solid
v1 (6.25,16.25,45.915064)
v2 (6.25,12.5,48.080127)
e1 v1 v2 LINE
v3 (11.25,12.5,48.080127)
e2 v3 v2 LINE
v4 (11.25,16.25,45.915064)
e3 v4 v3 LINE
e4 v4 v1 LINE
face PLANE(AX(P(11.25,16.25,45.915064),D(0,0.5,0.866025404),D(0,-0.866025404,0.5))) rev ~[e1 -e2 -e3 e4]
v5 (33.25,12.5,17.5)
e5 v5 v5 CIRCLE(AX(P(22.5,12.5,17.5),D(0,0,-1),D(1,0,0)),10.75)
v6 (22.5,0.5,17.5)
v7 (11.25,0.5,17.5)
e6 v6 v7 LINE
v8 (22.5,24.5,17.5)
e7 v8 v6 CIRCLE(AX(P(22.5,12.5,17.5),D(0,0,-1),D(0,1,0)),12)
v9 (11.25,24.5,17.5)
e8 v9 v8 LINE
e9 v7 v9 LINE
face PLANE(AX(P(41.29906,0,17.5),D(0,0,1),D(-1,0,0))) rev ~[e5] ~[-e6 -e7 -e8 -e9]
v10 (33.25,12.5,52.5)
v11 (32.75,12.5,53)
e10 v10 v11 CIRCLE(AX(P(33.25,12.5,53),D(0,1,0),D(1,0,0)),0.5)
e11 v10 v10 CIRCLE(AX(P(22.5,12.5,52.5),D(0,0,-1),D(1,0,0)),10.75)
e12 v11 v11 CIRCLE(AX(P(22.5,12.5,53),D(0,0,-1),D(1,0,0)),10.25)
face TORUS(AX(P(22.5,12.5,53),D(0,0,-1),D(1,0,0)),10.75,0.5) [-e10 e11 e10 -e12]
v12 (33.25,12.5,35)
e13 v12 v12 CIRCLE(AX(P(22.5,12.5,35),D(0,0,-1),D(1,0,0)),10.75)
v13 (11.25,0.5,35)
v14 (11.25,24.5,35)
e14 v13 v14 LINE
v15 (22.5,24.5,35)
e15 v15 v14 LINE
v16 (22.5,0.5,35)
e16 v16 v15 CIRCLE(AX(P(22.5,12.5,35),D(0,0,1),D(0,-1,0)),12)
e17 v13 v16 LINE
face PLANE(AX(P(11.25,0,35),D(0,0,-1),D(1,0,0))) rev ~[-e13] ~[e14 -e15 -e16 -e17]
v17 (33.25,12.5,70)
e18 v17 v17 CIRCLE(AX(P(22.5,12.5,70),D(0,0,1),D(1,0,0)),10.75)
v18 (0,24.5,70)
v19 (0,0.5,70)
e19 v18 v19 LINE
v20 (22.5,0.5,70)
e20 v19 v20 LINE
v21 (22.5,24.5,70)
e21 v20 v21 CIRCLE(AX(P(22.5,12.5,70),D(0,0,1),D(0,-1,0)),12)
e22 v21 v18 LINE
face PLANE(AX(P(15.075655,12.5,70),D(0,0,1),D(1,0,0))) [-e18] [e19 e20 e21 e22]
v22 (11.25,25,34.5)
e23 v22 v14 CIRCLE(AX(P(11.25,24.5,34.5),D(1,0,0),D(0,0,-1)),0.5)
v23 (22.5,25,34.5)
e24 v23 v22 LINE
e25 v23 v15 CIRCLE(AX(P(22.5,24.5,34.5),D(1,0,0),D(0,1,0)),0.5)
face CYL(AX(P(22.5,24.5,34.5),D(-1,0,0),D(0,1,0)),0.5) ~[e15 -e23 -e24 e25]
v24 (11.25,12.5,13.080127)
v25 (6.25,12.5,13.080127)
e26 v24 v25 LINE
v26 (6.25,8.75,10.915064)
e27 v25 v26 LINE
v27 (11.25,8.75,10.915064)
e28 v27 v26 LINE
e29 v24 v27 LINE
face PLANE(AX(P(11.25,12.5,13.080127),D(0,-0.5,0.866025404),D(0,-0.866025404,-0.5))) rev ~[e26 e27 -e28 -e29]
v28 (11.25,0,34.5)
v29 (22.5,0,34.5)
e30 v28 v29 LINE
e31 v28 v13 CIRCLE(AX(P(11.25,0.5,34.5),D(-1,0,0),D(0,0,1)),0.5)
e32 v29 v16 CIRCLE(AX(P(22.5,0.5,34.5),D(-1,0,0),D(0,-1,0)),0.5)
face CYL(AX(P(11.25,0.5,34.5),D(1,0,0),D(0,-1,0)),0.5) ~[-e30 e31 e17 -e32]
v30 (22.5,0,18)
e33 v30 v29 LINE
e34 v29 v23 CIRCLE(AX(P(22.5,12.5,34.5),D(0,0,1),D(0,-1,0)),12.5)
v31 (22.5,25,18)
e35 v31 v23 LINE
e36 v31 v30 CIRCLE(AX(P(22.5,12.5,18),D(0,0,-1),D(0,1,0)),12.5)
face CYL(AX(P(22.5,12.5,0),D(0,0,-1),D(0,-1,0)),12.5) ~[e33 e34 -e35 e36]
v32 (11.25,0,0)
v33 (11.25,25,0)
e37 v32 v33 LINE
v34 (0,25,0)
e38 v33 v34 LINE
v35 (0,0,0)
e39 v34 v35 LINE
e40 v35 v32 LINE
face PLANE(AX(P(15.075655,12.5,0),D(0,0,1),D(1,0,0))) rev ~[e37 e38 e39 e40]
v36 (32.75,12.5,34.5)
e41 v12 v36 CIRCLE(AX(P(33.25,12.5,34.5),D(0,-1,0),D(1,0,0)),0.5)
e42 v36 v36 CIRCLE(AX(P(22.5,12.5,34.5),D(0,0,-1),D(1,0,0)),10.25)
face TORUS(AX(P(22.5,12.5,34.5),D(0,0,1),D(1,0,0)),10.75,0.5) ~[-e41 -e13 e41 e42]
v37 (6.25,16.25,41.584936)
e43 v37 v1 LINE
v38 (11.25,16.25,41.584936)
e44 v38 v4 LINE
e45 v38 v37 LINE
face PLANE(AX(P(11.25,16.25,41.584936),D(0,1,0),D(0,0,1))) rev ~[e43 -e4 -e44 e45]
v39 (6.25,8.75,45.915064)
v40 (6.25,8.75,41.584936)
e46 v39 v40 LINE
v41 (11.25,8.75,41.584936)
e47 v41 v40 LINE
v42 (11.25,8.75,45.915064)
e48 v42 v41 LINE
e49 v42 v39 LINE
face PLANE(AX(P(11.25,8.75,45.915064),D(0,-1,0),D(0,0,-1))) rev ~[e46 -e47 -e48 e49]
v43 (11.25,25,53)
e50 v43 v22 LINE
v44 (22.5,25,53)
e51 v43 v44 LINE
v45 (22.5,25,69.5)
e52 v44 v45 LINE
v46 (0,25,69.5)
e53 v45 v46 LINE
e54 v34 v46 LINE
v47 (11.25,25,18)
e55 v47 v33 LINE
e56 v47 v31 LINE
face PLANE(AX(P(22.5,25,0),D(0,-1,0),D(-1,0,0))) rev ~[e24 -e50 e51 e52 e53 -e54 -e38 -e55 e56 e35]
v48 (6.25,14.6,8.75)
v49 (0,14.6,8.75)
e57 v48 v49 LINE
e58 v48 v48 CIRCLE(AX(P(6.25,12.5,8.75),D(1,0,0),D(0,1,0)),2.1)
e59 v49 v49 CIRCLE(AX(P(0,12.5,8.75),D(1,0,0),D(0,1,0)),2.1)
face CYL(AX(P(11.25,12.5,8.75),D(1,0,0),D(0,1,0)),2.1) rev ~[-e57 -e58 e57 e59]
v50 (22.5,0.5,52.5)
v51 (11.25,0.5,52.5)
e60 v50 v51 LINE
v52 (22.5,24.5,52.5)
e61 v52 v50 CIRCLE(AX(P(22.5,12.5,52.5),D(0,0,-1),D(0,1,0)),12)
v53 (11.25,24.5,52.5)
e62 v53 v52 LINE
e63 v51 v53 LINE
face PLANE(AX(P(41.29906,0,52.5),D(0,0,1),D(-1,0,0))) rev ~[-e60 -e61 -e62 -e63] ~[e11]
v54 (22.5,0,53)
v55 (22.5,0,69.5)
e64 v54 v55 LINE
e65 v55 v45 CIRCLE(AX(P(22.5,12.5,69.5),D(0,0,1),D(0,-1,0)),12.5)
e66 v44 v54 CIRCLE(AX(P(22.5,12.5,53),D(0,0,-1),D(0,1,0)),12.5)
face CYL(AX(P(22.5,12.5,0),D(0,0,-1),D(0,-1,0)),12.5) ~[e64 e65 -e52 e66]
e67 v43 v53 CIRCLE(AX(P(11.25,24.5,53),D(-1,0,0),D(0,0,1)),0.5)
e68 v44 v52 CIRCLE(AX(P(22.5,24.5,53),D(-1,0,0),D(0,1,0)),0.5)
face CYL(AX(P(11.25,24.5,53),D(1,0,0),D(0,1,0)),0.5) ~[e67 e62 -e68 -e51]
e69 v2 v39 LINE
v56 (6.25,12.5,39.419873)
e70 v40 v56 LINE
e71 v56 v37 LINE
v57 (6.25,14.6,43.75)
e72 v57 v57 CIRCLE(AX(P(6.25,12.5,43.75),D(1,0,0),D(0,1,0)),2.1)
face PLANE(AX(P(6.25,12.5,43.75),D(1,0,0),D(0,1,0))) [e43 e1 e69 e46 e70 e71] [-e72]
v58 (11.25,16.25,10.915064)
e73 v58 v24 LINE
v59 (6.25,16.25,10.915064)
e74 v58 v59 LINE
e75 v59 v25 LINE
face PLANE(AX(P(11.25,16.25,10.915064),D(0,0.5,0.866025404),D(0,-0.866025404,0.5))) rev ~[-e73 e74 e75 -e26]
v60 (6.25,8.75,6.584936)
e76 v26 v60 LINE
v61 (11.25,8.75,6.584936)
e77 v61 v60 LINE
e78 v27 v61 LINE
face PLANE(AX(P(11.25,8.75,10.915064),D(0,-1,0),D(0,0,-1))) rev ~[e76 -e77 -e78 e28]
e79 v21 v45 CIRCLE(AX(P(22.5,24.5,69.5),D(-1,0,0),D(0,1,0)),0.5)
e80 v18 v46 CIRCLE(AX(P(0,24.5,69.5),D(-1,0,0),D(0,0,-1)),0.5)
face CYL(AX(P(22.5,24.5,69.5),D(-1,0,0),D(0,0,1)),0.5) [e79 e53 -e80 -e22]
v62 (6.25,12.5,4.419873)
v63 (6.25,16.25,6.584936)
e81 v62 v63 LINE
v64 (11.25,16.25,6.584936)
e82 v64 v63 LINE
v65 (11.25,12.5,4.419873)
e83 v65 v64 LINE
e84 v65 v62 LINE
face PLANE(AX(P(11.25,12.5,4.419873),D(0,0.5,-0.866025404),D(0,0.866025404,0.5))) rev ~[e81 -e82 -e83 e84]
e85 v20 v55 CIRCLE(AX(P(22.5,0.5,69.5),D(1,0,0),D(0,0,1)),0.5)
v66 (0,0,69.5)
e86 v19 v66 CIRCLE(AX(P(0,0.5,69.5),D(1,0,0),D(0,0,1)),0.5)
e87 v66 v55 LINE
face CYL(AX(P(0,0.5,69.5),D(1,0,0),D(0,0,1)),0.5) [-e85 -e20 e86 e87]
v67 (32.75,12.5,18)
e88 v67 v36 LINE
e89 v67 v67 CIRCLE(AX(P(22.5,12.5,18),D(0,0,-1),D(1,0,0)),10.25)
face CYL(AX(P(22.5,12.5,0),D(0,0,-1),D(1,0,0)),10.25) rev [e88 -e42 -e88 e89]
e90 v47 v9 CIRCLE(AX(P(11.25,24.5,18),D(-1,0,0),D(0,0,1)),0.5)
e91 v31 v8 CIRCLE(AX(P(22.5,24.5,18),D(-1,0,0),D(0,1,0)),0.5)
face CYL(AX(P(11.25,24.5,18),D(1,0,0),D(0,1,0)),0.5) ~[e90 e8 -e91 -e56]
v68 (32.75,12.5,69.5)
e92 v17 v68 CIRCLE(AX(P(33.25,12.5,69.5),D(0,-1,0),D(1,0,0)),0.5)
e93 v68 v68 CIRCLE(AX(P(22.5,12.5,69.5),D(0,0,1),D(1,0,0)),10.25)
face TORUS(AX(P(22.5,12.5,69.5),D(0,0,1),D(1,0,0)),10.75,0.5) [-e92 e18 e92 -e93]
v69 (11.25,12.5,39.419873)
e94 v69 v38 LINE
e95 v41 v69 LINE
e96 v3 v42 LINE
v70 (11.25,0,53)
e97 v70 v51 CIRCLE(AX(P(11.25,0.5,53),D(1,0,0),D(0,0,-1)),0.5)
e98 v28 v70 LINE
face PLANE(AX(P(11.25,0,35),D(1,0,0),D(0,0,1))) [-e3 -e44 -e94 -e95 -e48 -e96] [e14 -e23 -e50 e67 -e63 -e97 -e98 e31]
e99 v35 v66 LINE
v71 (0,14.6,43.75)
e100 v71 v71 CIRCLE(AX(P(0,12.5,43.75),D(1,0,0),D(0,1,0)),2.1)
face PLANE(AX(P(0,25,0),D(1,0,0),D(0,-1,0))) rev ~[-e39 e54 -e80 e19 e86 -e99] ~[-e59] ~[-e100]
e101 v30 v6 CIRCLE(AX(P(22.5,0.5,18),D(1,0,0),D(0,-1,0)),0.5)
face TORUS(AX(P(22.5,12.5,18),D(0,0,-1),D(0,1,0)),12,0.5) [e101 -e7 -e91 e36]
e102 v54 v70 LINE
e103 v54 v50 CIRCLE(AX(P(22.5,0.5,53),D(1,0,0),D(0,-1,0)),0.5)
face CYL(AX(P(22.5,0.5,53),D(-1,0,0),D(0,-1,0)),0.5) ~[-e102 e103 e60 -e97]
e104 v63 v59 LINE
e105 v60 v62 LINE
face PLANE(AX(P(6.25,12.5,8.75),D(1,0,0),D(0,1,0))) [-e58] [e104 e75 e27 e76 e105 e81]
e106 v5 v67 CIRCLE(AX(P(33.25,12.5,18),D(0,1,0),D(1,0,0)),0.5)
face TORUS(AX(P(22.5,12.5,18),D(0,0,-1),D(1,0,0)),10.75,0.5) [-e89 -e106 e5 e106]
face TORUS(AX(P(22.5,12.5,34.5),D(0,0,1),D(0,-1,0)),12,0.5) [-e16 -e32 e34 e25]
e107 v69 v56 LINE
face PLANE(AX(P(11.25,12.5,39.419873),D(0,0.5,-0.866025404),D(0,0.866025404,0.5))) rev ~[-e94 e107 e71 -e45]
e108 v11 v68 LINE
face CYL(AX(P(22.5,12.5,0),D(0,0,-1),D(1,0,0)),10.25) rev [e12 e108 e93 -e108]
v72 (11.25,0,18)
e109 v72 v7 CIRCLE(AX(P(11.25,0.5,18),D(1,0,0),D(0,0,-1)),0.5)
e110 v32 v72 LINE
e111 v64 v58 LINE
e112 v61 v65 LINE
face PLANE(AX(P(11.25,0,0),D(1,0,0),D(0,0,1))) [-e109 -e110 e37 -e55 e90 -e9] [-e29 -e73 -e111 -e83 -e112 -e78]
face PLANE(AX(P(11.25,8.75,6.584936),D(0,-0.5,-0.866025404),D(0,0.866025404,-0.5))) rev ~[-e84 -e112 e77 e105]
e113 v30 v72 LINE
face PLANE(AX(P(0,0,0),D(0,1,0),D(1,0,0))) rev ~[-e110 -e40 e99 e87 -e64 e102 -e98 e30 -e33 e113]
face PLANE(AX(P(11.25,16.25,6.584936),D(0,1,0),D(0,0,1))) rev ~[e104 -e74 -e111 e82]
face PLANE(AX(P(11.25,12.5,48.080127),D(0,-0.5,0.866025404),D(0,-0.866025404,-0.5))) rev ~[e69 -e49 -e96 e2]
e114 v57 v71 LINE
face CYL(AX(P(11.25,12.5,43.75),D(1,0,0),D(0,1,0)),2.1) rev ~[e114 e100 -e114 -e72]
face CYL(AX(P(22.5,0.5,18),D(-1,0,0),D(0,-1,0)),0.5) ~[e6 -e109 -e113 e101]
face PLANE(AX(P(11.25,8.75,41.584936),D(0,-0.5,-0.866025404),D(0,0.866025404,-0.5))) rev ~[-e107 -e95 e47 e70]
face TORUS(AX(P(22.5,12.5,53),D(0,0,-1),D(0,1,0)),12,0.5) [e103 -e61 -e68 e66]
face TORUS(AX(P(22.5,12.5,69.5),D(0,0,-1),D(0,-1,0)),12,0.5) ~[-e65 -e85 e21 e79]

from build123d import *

# Parameters (mm, degrees)
F0_R     = 10.25
F1_DEPTH = 70
F2_W     = 11.25
F2_H     = 17.5
F2_W_2   = 18.7990599871
F3_DEPTH = 30
F4_R     = 2.1
F5_DEPTH = 5
F6_DEPTH = 11.251
F7_R     = 2.1
F8_DEPTH = 5
F9_DEPTH = 11.251
F10_R    = 0.5


# Not quite as in the source:
# - a feature names something its author has since deleted; it is built from what else it names


with BuildPart() as f1:
    # F0 (on Top) → F1 (new body)
    with BuildSketch(Plane.XY):
        with BuildLine():
            Line((0, 25), (0, 0))
            Line((0, 0), (22.5, 0))
            ThreePointArc((22.5, 0), (35, 12.5), (22.5, 25))
            Line((22.5, 25), (0, 25))
        make_face()
        with Locations((22.5, 12.5)):
            Circle(F0_R, mode=Mode.SUBTRACT)
    extrude(amount=F1_DEPTH)

    # F2 (on face) → F3 (cut)
    with BuildSketch(Plane.XZ):
        with Locations((16.875, 8.75)):
            Rectangle(F2_W, F2_H)
        with Locations((31.8995299935, 8.75)):
            Rectangle(F2_W_2, F2_H)
        with Locations((16.875, 43.75)):
            Rectangle(F2_W, F2_H)
        with Locations((31.8995299935, 43.75)):
            Rectangle(F2_W_2, F2_H)
    extrude(amount=-F3_DEPTH, mode=Mode.SUBTRACT)

    # F4 (on face) → F5 (cut)
    with BuildSketch(Plane.YZ.offset(11.25)):
        Polygon((16.25, 41.5849364905), (16.25, 45.9150635095), (12.5, 48.0801270189), (8.75, 45.9150635095), (8.75, 41.5849364905), (12.5, 39.4198729811), align=None)
        with Locations((12.5, 43.75)):
            Circle(F4_R, mode=Mode.SUBTRACT)
    extrude(amount=-F5_DEPTH, mode=Mode.SUBTRACT)

    # F6 (cut, through all): a face of the model
    f6_faces = [f1.faces().sort_by_distance(p)[0] for p in [
        (11.25, 12.5, 43.75),
    ]]
    extrude(f6_faces, amount=-F6_DEPTH, mode=Mode.SUBTRACT)

    # F7 (on face) → F8 (cut)
    with BuildSketch(Plane.YZ.offset(11.25)):
        Polygon((16.25, 6.5849364905), (16.25, 10.9150635095), (12.5, 13.0801270189), (8.75, 10.9150635095), (8.75, 6.5849364905), (12.5, 4.4198729811), align=None)
        with Locations((12.5, 8.75)):
            Circle(F7_R, mode=Mode.SUBTRACT)
    extrude(amount=-F8_DEPTH, mode=Mode.SUBTRACT)

    # F9 (cut, through all): a face of the model
    f9_faces = [f1.faces().sort_by_distance(p)[0] for p in [
        (11.25, 12.5, 8.75),
    ]]
    extrude(f9_faces, amount=-F9_DEPTH, mode=Mode.SUBTRACT)

    # F10
    f10_edges = [f1.edges().sort_by_distance(p)[0] for p in [
        (16.875, 0, 52.5),
        (16.875, 0, 35),
        (16.875, 0, 17.5),
        (12.25, 12.5, 17.5),
        (12.25, 12.5, 35),
        (12.25, 12.5, 52.5),
        (12.25, 12.5, 70),
        (35, 12.5, 70),
    ]]
    fillet(f10_edges, radius=F10_R)


solid = f1.part
